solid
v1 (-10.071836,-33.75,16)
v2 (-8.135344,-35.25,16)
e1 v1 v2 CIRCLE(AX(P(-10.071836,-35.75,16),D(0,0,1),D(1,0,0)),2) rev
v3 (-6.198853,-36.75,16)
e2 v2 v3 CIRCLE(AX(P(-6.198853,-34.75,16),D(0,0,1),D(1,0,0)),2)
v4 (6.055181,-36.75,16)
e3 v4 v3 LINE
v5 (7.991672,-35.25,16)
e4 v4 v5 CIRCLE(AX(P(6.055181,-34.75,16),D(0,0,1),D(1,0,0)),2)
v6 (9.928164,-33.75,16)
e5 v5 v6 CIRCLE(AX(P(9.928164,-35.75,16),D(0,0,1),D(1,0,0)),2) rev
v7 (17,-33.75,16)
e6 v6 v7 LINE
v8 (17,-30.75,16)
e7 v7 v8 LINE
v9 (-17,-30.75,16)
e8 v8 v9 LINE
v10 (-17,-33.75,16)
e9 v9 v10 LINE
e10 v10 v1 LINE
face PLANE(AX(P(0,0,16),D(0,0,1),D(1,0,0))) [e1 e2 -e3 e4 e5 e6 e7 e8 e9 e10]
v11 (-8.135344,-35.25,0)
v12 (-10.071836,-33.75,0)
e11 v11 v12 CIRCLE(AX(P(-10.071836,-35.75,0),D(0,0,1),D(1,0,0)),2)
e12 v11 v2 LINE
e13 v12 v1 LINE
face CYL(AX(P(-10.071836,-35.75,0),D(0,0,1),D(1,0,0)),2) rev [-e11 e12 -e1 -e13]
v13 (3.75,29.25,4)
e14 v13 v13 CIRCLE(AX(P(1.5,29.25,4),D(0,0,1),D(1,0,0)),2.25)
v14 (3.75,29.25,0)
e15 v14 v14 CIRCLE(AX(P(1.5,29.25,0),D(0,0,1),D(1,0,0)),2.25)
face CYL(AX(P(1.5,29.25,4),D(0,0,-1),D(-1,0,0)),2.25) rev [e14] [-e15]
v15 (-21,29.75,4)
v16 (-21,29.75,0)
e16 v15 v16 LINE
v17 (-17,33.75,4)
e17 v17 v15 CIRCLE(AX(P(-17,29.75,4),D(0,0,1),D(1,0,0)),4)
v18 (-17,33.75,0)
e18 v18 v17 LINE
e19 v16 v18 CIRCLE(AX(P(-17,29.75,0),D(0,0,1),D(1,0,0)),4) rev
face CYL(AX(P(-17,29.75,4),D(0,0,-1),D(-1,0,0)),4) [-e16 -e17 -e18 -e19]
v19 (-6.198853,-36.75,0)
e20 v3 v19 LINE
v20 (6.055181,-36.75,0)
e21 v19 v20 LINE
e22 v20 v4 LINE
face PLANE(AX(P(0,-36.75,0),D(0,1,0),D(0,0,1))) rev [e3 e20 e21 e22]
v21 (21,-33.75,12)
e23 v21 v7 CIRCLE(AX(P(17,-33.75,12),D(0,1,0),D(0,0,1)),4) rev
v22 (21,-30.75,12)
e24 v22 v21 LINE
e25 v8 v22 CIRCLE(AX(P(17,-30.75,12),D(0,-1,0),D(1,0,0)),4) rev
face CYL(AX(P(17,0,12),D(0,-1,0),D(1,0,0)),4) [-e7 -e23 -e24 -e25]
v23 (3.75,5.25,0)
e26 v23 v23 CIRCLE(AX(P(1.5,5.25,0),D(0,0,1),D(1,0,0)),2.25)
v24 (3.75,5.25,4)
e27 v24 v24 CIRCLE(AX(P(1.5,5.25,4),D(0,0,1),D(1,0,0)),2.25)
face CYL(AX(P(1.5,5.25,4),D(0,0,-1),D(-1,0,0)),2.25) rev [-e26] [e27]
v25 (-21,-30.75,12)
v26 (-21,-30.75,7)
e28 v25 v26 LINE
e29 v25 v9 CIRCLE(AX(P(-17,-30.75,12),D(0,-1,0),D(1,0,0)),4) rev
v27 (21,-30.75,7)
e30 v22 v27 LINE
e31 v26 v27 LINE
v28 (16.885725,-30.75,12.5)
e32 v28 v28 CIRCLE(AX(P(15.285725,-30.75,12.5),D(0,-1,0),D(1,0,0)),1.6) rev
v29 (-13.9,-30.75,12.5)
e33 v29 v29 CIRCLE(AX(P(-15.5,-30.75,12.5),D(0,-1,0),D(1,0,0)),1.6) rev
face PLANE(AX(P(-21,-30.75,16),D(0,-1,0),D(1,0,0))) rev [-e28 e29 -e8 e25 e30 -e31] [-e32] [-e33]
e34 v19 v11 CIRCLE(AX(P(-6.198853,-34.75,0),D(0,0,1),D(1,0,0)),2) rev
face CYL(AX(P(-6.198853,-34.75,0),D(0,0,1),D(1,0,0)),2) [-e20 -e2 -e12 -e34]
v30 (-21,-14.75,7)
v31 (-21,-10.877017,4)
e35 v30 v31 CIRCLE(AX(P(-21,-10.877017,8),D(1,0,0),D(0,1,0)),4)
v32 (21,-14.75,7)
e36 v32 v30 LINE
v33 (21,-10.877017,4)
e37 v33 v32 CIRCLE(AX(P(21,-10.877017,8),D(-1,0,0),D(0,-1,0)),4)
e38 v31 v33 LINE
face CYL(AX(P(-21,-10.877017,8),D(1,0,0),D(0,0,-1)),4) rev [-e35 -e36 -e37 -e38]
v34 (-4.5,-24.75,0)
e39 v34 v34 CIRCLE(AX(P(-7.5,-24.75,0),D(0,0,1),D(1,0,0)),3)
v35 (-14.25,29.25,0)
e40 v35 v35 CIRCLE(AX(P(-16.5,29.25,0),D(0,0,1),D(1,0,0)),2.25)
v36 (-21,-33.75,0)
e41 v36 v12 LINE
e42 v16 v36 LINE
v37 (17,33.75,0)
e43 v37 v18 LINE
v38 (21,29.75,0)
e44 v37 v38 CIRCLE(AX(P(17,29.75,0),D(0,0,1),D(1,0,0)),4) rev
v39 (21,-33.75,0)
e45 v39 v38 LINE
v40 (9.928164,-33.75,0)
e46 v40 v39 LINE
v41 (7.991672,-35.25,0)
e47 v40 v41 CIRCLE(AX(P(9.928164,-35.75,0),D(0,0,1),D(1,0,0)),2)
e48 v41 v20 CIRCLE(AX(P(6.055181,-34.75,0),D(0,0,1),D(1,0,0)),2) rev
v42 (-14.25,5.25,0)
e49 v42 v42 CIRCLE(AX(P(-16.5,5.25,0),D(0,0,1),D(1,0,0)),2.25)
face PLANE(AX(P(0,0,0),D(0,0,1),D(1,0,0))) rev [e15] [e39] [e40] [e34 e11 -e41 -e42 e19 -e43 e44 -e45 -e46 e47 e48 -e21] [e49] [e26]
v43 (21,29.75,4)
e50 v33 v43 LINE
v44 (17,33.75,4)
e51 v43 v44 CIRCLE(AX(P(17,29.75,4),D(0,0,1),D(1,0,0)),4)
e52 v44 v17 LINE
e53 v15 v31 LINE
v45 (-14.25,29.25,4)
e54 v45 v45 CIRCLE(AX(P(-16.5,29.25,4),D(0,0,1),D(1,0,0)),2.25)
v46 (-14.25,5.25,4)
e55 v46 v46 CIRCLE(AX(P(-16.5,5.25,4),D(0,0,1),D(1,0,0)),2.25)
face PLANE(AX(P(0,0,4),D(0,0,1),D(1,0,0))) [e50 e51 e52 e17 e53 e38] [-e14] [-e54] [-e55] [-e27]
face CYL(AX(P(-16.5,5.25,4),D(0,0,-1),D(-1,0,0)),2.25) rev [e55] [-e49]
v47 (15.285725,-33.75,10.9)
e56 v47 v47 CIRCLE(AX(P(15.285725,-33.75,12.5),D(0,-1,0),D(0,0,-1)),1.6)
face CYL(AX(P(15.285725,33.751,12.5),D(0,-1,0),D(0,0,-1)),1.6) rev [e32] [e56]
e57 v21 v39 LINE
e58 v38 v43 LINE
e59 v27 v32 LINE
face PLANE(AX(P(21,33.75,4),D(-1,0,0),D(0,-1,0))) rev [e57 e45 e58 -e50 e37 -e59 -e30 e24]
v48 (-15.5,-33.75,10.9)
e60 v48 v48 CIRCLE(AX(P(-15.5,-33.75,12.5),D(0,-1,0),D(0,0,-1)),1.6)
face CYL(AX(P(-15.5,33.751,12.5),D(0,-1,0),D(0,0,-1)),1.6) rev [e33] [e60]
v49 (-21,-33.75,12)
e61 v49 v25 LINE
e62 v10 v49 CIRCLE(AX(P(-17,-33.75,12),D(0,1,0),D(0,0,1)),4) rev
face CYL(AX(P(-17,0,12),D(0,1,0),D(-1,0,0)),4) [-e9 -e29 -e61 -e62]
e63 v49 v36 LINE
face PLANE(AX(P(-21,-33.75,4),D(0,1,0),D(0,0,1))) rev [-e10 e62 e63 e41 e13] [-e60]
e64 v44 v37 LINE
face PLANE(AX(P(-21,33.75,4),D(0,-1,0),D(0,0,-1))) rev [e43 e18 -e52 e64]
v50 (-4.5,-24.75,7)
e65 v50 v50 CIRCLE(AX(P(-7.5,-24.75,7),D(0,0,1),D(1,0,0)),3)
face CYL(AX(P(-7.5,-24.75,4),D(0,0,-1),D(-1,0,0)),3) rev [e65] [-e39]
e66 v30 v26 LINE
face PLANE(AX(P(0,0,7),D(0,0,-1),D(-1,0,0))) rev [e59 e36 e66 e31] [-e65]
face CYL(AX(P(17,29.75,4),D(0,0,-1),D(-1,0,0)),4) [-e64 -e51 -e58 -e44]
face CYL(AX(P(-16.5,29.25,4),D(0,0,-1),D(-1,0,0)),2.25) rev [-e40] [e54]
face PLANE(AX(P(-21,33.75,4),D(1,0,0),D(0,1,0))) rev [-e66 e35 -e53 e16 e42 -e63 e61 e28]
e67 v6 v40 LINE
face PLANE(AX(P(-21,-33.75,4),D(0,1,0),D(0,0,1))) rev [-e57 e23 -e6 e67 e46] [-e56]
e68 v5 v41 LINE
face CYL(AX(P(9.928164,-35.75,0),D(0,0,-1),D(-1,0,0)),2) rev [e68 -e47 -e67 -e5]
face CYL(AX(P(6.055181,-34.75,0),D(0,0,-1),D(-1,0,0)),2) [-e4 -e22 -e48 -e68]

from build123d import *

# Parameters (mm, degrees)
SKETCH1_W           = 42
SKETCH1_H           = 67.5
SKETCH1_R           = 3
SKETCH1_R_2         = 2.25
BOSS_EXTRUDE1_DEPTH = 4
SKETCH2_W           = 42
SKETCH2_H           = 3
BOSS_EXTRUDE2_DEPTH = 12
SKETCH3_W           = 42
SKETCH3_H           = 16
SKETCH3_R           = 3
BOSS_EXTRUDE3_DEPTH = 3
CUT_EXTRUDE1_REACH  = 74.479
SKETCH4_R           = 1.6
FILLET1_R           = 4
SKETCH5_W           = 16
SKETCH5_H           = 16
BOSS_EXTRUDE4_DEPTH = 3
FILLET3_R           = 2
FILLET4_R           = 2


with BuildPart() as part:
    # Sketch1 → Boss-Extrude1 (new body)
    with BuildSketch(Plane.XY):
        Rectangle(SKETCH1_W, SKETCH1_H)
        with Locations((-7.5, -24.75)):
            Circle(SKETCH1_R, mode=Mode.SUBTRACT)
        with Locations((1.5, 29.25)):
            Circle(SKETCH1_R_2, mode=Mode.SUBTRACT)
        with Locations((-16.5, 29.25)):
            Circle(SKETCH1_R_2, mode=Mode.SUBTRACT)
        with Locations((1.5, 5.25)):
            Circle(SKETCH1_R_2, mode=Mode.SUBTRACT)
        with Locations((-16.5, 5.25)):
            Circle(SKETCH1_R_2, mode=Mode.SUBTRACT)
    extrude(amount=BOSS_EXTRUDE1_DEPTH)

    # Sketch2 → Boss-Extrude2 (add)
    with BuildSketch(Plane.XY.offset(4)):
        with Locations((0, -32.25)):
            Rectangle(SKETCH2_W, SKETCH2_H)
    extrude(amount=BOSS_EXTRUDE2_DEPTH)

    # Sketch3 → Boss-Extrude3 (add)
    with BuildSketch(Plane.XY.offset(4)):
        with Locations((0, -22.75)):
            Rectangle(SKETCH3_W, SKETCH3_H)
        with Locations((-7.5, -24.75)):
            Circle(SKETCH3_R, mode=Mode.SUBTRACT)
    extrude(amount=BOSS_EXTRUDE3_DEPTH)

    # Sketch4 → Cut-Extrude1 (cut, up to next)
    with BuildSketch(Plane.XZ.offset(33.75), mode=Mode.PRIVATE) as cut_extrude1_sk1:
        with Locations(Location((-15.5, 12.5, 0), (0, 0, 270))):
            Circle(SKETCH4_R)
    cut_extrude1_tool1 = extrude(cut_extrude1_sk1.sketch, amount=-CUT_EXTRUDE1_REACH, mode=Mode.PRIVATE) & part.part
    # Sketch4 → Cut-Extrude1 (cut, up to next)
    with BuildSketch(Plane.XZ.offset(33.75), mode=Mode.PRIVATE) as cut_extrude1_sk2:
        with Locations(Location((15.285724533, 12.5, 0), (0, 0, 270))):
            Circle(SKETCH4_R)
    cut_extrude1_tool2 = extrude(cut_extrude1_sk2.sketch, amount=-CUT_EXTRUDE1_REACH, mode=Mode.PRIVATE) & part.part
    add(cut_extrude1_tool1.solids().sort_by_distance((-15.5, -33.75, 12.5))[0], mode=Mode.SUBTRACT)
    add(cut_extrude1_tool2.solids().sort_by_distance((15.285725, -33.75, 12.5))[0], mode=Mode.SUBTRACT)

    # Fillet1
    # the kernel refuses this fillet: 4 mm, written as the material it adds along each edge
    with BuildSketch(Plane(origin=(-21, -14.75, 4), x_dir=(0, 1, 0), z_dir=(1, 0, 0))) as fillet1_piece_1:
        with BuildLine():
            CenterArc((3.872983346, 4), FILLET1_R, 194.477512186, 75.522487814)
            Line((0, 3), (0, 0))
            Line((0, 0), (3.872983346, 0))
        make_face()
    extrude(amount=42)
    # the kernel refuses this fillet: 4 mm, written as the material it takes off along each edge
    with BuildSketch(Plane(origin=(21, -20.75, 16), x_dir=(0, 0, -1), z_dir=(0, -1, 0)), Plane(origin=(-21, -43.75, 16), x_dir=(0, 0, -1), z_dir=(0, 1, 0))) as fillet1_2_piece_1:
        with BuildLine():
            CenterArc((FILLET1_R, -FILLET1_R), FILLET1_R, 90, 90)
            Line((0, -FILLET1_R), (0, 0))
            Line((0, 0), (FILLET1_R, 0))
        make_face()
    extrude(amount=23, mode=Mode.SUBTRACT)
    with BuildSketch(Plane(origin=(21, 33.75, -10), x_dir=(-1, 0, 0), z_dir=(0, 0, 1))) as fillet1_2_piece_2:
        with BuildLine():
            CenterArc((FILLET1_R, FILLET1_R), FILLET1_R, 180, 90)
            Line((0, FILLET1_R), (0, 0))
            Line((0, 0), (FILLET1_R, 0))
        make_face()
    extrude(amount=24, mode=Mode.SUBTRACT)
    with BuildSketch(Plane(origin=(-21, 33.75, -10), x_dir=(1, 0, 0), z_dir=(0, 0, 1))) as fillet1_2_piece_3:
        with BuildLine():
            CenterArc((FILLET1_R, -FILLET1_R), FILLET1_R, 90, 90)
            Line((0, -FILLET1_R), (0, 0))
            Line((0, 0), (FILLET1_R, 0))
        make_face()
    extrude(amount=24, mode=Mode.SUBTRACT)

    # Sketch5 → Boss-Extrude4 (add)
    with BuildSketch(Plane.XZ.offset(33.75)):
        with Locations((-0.071835854, 8)):
            Rectangle(SKETCH5_W, SKETCH5_H)
    extrude(amount=BOSS_EXTRUDE4_DEPTH)

    # Fillet3
    fillet3_edges = [part.edges().sort_by_distance(p)[0] for p in [
        (-8.071835854, -33.75, 8),
        (7.928164146, -33.75, 8),
    ]]
    fillet(fillet3_edges, radius=FILLET3_R)

    # Fillet4
    fillet4_edges = [part.edges().sort_by_distance(p)[0] for p in [
        (7.928164146, -36.75, 8),
        (-8.071835854, -36.75, 8),
    ]]
    fillet(fillet4_edges, radius=FILLET4_R)


solid = part.part
